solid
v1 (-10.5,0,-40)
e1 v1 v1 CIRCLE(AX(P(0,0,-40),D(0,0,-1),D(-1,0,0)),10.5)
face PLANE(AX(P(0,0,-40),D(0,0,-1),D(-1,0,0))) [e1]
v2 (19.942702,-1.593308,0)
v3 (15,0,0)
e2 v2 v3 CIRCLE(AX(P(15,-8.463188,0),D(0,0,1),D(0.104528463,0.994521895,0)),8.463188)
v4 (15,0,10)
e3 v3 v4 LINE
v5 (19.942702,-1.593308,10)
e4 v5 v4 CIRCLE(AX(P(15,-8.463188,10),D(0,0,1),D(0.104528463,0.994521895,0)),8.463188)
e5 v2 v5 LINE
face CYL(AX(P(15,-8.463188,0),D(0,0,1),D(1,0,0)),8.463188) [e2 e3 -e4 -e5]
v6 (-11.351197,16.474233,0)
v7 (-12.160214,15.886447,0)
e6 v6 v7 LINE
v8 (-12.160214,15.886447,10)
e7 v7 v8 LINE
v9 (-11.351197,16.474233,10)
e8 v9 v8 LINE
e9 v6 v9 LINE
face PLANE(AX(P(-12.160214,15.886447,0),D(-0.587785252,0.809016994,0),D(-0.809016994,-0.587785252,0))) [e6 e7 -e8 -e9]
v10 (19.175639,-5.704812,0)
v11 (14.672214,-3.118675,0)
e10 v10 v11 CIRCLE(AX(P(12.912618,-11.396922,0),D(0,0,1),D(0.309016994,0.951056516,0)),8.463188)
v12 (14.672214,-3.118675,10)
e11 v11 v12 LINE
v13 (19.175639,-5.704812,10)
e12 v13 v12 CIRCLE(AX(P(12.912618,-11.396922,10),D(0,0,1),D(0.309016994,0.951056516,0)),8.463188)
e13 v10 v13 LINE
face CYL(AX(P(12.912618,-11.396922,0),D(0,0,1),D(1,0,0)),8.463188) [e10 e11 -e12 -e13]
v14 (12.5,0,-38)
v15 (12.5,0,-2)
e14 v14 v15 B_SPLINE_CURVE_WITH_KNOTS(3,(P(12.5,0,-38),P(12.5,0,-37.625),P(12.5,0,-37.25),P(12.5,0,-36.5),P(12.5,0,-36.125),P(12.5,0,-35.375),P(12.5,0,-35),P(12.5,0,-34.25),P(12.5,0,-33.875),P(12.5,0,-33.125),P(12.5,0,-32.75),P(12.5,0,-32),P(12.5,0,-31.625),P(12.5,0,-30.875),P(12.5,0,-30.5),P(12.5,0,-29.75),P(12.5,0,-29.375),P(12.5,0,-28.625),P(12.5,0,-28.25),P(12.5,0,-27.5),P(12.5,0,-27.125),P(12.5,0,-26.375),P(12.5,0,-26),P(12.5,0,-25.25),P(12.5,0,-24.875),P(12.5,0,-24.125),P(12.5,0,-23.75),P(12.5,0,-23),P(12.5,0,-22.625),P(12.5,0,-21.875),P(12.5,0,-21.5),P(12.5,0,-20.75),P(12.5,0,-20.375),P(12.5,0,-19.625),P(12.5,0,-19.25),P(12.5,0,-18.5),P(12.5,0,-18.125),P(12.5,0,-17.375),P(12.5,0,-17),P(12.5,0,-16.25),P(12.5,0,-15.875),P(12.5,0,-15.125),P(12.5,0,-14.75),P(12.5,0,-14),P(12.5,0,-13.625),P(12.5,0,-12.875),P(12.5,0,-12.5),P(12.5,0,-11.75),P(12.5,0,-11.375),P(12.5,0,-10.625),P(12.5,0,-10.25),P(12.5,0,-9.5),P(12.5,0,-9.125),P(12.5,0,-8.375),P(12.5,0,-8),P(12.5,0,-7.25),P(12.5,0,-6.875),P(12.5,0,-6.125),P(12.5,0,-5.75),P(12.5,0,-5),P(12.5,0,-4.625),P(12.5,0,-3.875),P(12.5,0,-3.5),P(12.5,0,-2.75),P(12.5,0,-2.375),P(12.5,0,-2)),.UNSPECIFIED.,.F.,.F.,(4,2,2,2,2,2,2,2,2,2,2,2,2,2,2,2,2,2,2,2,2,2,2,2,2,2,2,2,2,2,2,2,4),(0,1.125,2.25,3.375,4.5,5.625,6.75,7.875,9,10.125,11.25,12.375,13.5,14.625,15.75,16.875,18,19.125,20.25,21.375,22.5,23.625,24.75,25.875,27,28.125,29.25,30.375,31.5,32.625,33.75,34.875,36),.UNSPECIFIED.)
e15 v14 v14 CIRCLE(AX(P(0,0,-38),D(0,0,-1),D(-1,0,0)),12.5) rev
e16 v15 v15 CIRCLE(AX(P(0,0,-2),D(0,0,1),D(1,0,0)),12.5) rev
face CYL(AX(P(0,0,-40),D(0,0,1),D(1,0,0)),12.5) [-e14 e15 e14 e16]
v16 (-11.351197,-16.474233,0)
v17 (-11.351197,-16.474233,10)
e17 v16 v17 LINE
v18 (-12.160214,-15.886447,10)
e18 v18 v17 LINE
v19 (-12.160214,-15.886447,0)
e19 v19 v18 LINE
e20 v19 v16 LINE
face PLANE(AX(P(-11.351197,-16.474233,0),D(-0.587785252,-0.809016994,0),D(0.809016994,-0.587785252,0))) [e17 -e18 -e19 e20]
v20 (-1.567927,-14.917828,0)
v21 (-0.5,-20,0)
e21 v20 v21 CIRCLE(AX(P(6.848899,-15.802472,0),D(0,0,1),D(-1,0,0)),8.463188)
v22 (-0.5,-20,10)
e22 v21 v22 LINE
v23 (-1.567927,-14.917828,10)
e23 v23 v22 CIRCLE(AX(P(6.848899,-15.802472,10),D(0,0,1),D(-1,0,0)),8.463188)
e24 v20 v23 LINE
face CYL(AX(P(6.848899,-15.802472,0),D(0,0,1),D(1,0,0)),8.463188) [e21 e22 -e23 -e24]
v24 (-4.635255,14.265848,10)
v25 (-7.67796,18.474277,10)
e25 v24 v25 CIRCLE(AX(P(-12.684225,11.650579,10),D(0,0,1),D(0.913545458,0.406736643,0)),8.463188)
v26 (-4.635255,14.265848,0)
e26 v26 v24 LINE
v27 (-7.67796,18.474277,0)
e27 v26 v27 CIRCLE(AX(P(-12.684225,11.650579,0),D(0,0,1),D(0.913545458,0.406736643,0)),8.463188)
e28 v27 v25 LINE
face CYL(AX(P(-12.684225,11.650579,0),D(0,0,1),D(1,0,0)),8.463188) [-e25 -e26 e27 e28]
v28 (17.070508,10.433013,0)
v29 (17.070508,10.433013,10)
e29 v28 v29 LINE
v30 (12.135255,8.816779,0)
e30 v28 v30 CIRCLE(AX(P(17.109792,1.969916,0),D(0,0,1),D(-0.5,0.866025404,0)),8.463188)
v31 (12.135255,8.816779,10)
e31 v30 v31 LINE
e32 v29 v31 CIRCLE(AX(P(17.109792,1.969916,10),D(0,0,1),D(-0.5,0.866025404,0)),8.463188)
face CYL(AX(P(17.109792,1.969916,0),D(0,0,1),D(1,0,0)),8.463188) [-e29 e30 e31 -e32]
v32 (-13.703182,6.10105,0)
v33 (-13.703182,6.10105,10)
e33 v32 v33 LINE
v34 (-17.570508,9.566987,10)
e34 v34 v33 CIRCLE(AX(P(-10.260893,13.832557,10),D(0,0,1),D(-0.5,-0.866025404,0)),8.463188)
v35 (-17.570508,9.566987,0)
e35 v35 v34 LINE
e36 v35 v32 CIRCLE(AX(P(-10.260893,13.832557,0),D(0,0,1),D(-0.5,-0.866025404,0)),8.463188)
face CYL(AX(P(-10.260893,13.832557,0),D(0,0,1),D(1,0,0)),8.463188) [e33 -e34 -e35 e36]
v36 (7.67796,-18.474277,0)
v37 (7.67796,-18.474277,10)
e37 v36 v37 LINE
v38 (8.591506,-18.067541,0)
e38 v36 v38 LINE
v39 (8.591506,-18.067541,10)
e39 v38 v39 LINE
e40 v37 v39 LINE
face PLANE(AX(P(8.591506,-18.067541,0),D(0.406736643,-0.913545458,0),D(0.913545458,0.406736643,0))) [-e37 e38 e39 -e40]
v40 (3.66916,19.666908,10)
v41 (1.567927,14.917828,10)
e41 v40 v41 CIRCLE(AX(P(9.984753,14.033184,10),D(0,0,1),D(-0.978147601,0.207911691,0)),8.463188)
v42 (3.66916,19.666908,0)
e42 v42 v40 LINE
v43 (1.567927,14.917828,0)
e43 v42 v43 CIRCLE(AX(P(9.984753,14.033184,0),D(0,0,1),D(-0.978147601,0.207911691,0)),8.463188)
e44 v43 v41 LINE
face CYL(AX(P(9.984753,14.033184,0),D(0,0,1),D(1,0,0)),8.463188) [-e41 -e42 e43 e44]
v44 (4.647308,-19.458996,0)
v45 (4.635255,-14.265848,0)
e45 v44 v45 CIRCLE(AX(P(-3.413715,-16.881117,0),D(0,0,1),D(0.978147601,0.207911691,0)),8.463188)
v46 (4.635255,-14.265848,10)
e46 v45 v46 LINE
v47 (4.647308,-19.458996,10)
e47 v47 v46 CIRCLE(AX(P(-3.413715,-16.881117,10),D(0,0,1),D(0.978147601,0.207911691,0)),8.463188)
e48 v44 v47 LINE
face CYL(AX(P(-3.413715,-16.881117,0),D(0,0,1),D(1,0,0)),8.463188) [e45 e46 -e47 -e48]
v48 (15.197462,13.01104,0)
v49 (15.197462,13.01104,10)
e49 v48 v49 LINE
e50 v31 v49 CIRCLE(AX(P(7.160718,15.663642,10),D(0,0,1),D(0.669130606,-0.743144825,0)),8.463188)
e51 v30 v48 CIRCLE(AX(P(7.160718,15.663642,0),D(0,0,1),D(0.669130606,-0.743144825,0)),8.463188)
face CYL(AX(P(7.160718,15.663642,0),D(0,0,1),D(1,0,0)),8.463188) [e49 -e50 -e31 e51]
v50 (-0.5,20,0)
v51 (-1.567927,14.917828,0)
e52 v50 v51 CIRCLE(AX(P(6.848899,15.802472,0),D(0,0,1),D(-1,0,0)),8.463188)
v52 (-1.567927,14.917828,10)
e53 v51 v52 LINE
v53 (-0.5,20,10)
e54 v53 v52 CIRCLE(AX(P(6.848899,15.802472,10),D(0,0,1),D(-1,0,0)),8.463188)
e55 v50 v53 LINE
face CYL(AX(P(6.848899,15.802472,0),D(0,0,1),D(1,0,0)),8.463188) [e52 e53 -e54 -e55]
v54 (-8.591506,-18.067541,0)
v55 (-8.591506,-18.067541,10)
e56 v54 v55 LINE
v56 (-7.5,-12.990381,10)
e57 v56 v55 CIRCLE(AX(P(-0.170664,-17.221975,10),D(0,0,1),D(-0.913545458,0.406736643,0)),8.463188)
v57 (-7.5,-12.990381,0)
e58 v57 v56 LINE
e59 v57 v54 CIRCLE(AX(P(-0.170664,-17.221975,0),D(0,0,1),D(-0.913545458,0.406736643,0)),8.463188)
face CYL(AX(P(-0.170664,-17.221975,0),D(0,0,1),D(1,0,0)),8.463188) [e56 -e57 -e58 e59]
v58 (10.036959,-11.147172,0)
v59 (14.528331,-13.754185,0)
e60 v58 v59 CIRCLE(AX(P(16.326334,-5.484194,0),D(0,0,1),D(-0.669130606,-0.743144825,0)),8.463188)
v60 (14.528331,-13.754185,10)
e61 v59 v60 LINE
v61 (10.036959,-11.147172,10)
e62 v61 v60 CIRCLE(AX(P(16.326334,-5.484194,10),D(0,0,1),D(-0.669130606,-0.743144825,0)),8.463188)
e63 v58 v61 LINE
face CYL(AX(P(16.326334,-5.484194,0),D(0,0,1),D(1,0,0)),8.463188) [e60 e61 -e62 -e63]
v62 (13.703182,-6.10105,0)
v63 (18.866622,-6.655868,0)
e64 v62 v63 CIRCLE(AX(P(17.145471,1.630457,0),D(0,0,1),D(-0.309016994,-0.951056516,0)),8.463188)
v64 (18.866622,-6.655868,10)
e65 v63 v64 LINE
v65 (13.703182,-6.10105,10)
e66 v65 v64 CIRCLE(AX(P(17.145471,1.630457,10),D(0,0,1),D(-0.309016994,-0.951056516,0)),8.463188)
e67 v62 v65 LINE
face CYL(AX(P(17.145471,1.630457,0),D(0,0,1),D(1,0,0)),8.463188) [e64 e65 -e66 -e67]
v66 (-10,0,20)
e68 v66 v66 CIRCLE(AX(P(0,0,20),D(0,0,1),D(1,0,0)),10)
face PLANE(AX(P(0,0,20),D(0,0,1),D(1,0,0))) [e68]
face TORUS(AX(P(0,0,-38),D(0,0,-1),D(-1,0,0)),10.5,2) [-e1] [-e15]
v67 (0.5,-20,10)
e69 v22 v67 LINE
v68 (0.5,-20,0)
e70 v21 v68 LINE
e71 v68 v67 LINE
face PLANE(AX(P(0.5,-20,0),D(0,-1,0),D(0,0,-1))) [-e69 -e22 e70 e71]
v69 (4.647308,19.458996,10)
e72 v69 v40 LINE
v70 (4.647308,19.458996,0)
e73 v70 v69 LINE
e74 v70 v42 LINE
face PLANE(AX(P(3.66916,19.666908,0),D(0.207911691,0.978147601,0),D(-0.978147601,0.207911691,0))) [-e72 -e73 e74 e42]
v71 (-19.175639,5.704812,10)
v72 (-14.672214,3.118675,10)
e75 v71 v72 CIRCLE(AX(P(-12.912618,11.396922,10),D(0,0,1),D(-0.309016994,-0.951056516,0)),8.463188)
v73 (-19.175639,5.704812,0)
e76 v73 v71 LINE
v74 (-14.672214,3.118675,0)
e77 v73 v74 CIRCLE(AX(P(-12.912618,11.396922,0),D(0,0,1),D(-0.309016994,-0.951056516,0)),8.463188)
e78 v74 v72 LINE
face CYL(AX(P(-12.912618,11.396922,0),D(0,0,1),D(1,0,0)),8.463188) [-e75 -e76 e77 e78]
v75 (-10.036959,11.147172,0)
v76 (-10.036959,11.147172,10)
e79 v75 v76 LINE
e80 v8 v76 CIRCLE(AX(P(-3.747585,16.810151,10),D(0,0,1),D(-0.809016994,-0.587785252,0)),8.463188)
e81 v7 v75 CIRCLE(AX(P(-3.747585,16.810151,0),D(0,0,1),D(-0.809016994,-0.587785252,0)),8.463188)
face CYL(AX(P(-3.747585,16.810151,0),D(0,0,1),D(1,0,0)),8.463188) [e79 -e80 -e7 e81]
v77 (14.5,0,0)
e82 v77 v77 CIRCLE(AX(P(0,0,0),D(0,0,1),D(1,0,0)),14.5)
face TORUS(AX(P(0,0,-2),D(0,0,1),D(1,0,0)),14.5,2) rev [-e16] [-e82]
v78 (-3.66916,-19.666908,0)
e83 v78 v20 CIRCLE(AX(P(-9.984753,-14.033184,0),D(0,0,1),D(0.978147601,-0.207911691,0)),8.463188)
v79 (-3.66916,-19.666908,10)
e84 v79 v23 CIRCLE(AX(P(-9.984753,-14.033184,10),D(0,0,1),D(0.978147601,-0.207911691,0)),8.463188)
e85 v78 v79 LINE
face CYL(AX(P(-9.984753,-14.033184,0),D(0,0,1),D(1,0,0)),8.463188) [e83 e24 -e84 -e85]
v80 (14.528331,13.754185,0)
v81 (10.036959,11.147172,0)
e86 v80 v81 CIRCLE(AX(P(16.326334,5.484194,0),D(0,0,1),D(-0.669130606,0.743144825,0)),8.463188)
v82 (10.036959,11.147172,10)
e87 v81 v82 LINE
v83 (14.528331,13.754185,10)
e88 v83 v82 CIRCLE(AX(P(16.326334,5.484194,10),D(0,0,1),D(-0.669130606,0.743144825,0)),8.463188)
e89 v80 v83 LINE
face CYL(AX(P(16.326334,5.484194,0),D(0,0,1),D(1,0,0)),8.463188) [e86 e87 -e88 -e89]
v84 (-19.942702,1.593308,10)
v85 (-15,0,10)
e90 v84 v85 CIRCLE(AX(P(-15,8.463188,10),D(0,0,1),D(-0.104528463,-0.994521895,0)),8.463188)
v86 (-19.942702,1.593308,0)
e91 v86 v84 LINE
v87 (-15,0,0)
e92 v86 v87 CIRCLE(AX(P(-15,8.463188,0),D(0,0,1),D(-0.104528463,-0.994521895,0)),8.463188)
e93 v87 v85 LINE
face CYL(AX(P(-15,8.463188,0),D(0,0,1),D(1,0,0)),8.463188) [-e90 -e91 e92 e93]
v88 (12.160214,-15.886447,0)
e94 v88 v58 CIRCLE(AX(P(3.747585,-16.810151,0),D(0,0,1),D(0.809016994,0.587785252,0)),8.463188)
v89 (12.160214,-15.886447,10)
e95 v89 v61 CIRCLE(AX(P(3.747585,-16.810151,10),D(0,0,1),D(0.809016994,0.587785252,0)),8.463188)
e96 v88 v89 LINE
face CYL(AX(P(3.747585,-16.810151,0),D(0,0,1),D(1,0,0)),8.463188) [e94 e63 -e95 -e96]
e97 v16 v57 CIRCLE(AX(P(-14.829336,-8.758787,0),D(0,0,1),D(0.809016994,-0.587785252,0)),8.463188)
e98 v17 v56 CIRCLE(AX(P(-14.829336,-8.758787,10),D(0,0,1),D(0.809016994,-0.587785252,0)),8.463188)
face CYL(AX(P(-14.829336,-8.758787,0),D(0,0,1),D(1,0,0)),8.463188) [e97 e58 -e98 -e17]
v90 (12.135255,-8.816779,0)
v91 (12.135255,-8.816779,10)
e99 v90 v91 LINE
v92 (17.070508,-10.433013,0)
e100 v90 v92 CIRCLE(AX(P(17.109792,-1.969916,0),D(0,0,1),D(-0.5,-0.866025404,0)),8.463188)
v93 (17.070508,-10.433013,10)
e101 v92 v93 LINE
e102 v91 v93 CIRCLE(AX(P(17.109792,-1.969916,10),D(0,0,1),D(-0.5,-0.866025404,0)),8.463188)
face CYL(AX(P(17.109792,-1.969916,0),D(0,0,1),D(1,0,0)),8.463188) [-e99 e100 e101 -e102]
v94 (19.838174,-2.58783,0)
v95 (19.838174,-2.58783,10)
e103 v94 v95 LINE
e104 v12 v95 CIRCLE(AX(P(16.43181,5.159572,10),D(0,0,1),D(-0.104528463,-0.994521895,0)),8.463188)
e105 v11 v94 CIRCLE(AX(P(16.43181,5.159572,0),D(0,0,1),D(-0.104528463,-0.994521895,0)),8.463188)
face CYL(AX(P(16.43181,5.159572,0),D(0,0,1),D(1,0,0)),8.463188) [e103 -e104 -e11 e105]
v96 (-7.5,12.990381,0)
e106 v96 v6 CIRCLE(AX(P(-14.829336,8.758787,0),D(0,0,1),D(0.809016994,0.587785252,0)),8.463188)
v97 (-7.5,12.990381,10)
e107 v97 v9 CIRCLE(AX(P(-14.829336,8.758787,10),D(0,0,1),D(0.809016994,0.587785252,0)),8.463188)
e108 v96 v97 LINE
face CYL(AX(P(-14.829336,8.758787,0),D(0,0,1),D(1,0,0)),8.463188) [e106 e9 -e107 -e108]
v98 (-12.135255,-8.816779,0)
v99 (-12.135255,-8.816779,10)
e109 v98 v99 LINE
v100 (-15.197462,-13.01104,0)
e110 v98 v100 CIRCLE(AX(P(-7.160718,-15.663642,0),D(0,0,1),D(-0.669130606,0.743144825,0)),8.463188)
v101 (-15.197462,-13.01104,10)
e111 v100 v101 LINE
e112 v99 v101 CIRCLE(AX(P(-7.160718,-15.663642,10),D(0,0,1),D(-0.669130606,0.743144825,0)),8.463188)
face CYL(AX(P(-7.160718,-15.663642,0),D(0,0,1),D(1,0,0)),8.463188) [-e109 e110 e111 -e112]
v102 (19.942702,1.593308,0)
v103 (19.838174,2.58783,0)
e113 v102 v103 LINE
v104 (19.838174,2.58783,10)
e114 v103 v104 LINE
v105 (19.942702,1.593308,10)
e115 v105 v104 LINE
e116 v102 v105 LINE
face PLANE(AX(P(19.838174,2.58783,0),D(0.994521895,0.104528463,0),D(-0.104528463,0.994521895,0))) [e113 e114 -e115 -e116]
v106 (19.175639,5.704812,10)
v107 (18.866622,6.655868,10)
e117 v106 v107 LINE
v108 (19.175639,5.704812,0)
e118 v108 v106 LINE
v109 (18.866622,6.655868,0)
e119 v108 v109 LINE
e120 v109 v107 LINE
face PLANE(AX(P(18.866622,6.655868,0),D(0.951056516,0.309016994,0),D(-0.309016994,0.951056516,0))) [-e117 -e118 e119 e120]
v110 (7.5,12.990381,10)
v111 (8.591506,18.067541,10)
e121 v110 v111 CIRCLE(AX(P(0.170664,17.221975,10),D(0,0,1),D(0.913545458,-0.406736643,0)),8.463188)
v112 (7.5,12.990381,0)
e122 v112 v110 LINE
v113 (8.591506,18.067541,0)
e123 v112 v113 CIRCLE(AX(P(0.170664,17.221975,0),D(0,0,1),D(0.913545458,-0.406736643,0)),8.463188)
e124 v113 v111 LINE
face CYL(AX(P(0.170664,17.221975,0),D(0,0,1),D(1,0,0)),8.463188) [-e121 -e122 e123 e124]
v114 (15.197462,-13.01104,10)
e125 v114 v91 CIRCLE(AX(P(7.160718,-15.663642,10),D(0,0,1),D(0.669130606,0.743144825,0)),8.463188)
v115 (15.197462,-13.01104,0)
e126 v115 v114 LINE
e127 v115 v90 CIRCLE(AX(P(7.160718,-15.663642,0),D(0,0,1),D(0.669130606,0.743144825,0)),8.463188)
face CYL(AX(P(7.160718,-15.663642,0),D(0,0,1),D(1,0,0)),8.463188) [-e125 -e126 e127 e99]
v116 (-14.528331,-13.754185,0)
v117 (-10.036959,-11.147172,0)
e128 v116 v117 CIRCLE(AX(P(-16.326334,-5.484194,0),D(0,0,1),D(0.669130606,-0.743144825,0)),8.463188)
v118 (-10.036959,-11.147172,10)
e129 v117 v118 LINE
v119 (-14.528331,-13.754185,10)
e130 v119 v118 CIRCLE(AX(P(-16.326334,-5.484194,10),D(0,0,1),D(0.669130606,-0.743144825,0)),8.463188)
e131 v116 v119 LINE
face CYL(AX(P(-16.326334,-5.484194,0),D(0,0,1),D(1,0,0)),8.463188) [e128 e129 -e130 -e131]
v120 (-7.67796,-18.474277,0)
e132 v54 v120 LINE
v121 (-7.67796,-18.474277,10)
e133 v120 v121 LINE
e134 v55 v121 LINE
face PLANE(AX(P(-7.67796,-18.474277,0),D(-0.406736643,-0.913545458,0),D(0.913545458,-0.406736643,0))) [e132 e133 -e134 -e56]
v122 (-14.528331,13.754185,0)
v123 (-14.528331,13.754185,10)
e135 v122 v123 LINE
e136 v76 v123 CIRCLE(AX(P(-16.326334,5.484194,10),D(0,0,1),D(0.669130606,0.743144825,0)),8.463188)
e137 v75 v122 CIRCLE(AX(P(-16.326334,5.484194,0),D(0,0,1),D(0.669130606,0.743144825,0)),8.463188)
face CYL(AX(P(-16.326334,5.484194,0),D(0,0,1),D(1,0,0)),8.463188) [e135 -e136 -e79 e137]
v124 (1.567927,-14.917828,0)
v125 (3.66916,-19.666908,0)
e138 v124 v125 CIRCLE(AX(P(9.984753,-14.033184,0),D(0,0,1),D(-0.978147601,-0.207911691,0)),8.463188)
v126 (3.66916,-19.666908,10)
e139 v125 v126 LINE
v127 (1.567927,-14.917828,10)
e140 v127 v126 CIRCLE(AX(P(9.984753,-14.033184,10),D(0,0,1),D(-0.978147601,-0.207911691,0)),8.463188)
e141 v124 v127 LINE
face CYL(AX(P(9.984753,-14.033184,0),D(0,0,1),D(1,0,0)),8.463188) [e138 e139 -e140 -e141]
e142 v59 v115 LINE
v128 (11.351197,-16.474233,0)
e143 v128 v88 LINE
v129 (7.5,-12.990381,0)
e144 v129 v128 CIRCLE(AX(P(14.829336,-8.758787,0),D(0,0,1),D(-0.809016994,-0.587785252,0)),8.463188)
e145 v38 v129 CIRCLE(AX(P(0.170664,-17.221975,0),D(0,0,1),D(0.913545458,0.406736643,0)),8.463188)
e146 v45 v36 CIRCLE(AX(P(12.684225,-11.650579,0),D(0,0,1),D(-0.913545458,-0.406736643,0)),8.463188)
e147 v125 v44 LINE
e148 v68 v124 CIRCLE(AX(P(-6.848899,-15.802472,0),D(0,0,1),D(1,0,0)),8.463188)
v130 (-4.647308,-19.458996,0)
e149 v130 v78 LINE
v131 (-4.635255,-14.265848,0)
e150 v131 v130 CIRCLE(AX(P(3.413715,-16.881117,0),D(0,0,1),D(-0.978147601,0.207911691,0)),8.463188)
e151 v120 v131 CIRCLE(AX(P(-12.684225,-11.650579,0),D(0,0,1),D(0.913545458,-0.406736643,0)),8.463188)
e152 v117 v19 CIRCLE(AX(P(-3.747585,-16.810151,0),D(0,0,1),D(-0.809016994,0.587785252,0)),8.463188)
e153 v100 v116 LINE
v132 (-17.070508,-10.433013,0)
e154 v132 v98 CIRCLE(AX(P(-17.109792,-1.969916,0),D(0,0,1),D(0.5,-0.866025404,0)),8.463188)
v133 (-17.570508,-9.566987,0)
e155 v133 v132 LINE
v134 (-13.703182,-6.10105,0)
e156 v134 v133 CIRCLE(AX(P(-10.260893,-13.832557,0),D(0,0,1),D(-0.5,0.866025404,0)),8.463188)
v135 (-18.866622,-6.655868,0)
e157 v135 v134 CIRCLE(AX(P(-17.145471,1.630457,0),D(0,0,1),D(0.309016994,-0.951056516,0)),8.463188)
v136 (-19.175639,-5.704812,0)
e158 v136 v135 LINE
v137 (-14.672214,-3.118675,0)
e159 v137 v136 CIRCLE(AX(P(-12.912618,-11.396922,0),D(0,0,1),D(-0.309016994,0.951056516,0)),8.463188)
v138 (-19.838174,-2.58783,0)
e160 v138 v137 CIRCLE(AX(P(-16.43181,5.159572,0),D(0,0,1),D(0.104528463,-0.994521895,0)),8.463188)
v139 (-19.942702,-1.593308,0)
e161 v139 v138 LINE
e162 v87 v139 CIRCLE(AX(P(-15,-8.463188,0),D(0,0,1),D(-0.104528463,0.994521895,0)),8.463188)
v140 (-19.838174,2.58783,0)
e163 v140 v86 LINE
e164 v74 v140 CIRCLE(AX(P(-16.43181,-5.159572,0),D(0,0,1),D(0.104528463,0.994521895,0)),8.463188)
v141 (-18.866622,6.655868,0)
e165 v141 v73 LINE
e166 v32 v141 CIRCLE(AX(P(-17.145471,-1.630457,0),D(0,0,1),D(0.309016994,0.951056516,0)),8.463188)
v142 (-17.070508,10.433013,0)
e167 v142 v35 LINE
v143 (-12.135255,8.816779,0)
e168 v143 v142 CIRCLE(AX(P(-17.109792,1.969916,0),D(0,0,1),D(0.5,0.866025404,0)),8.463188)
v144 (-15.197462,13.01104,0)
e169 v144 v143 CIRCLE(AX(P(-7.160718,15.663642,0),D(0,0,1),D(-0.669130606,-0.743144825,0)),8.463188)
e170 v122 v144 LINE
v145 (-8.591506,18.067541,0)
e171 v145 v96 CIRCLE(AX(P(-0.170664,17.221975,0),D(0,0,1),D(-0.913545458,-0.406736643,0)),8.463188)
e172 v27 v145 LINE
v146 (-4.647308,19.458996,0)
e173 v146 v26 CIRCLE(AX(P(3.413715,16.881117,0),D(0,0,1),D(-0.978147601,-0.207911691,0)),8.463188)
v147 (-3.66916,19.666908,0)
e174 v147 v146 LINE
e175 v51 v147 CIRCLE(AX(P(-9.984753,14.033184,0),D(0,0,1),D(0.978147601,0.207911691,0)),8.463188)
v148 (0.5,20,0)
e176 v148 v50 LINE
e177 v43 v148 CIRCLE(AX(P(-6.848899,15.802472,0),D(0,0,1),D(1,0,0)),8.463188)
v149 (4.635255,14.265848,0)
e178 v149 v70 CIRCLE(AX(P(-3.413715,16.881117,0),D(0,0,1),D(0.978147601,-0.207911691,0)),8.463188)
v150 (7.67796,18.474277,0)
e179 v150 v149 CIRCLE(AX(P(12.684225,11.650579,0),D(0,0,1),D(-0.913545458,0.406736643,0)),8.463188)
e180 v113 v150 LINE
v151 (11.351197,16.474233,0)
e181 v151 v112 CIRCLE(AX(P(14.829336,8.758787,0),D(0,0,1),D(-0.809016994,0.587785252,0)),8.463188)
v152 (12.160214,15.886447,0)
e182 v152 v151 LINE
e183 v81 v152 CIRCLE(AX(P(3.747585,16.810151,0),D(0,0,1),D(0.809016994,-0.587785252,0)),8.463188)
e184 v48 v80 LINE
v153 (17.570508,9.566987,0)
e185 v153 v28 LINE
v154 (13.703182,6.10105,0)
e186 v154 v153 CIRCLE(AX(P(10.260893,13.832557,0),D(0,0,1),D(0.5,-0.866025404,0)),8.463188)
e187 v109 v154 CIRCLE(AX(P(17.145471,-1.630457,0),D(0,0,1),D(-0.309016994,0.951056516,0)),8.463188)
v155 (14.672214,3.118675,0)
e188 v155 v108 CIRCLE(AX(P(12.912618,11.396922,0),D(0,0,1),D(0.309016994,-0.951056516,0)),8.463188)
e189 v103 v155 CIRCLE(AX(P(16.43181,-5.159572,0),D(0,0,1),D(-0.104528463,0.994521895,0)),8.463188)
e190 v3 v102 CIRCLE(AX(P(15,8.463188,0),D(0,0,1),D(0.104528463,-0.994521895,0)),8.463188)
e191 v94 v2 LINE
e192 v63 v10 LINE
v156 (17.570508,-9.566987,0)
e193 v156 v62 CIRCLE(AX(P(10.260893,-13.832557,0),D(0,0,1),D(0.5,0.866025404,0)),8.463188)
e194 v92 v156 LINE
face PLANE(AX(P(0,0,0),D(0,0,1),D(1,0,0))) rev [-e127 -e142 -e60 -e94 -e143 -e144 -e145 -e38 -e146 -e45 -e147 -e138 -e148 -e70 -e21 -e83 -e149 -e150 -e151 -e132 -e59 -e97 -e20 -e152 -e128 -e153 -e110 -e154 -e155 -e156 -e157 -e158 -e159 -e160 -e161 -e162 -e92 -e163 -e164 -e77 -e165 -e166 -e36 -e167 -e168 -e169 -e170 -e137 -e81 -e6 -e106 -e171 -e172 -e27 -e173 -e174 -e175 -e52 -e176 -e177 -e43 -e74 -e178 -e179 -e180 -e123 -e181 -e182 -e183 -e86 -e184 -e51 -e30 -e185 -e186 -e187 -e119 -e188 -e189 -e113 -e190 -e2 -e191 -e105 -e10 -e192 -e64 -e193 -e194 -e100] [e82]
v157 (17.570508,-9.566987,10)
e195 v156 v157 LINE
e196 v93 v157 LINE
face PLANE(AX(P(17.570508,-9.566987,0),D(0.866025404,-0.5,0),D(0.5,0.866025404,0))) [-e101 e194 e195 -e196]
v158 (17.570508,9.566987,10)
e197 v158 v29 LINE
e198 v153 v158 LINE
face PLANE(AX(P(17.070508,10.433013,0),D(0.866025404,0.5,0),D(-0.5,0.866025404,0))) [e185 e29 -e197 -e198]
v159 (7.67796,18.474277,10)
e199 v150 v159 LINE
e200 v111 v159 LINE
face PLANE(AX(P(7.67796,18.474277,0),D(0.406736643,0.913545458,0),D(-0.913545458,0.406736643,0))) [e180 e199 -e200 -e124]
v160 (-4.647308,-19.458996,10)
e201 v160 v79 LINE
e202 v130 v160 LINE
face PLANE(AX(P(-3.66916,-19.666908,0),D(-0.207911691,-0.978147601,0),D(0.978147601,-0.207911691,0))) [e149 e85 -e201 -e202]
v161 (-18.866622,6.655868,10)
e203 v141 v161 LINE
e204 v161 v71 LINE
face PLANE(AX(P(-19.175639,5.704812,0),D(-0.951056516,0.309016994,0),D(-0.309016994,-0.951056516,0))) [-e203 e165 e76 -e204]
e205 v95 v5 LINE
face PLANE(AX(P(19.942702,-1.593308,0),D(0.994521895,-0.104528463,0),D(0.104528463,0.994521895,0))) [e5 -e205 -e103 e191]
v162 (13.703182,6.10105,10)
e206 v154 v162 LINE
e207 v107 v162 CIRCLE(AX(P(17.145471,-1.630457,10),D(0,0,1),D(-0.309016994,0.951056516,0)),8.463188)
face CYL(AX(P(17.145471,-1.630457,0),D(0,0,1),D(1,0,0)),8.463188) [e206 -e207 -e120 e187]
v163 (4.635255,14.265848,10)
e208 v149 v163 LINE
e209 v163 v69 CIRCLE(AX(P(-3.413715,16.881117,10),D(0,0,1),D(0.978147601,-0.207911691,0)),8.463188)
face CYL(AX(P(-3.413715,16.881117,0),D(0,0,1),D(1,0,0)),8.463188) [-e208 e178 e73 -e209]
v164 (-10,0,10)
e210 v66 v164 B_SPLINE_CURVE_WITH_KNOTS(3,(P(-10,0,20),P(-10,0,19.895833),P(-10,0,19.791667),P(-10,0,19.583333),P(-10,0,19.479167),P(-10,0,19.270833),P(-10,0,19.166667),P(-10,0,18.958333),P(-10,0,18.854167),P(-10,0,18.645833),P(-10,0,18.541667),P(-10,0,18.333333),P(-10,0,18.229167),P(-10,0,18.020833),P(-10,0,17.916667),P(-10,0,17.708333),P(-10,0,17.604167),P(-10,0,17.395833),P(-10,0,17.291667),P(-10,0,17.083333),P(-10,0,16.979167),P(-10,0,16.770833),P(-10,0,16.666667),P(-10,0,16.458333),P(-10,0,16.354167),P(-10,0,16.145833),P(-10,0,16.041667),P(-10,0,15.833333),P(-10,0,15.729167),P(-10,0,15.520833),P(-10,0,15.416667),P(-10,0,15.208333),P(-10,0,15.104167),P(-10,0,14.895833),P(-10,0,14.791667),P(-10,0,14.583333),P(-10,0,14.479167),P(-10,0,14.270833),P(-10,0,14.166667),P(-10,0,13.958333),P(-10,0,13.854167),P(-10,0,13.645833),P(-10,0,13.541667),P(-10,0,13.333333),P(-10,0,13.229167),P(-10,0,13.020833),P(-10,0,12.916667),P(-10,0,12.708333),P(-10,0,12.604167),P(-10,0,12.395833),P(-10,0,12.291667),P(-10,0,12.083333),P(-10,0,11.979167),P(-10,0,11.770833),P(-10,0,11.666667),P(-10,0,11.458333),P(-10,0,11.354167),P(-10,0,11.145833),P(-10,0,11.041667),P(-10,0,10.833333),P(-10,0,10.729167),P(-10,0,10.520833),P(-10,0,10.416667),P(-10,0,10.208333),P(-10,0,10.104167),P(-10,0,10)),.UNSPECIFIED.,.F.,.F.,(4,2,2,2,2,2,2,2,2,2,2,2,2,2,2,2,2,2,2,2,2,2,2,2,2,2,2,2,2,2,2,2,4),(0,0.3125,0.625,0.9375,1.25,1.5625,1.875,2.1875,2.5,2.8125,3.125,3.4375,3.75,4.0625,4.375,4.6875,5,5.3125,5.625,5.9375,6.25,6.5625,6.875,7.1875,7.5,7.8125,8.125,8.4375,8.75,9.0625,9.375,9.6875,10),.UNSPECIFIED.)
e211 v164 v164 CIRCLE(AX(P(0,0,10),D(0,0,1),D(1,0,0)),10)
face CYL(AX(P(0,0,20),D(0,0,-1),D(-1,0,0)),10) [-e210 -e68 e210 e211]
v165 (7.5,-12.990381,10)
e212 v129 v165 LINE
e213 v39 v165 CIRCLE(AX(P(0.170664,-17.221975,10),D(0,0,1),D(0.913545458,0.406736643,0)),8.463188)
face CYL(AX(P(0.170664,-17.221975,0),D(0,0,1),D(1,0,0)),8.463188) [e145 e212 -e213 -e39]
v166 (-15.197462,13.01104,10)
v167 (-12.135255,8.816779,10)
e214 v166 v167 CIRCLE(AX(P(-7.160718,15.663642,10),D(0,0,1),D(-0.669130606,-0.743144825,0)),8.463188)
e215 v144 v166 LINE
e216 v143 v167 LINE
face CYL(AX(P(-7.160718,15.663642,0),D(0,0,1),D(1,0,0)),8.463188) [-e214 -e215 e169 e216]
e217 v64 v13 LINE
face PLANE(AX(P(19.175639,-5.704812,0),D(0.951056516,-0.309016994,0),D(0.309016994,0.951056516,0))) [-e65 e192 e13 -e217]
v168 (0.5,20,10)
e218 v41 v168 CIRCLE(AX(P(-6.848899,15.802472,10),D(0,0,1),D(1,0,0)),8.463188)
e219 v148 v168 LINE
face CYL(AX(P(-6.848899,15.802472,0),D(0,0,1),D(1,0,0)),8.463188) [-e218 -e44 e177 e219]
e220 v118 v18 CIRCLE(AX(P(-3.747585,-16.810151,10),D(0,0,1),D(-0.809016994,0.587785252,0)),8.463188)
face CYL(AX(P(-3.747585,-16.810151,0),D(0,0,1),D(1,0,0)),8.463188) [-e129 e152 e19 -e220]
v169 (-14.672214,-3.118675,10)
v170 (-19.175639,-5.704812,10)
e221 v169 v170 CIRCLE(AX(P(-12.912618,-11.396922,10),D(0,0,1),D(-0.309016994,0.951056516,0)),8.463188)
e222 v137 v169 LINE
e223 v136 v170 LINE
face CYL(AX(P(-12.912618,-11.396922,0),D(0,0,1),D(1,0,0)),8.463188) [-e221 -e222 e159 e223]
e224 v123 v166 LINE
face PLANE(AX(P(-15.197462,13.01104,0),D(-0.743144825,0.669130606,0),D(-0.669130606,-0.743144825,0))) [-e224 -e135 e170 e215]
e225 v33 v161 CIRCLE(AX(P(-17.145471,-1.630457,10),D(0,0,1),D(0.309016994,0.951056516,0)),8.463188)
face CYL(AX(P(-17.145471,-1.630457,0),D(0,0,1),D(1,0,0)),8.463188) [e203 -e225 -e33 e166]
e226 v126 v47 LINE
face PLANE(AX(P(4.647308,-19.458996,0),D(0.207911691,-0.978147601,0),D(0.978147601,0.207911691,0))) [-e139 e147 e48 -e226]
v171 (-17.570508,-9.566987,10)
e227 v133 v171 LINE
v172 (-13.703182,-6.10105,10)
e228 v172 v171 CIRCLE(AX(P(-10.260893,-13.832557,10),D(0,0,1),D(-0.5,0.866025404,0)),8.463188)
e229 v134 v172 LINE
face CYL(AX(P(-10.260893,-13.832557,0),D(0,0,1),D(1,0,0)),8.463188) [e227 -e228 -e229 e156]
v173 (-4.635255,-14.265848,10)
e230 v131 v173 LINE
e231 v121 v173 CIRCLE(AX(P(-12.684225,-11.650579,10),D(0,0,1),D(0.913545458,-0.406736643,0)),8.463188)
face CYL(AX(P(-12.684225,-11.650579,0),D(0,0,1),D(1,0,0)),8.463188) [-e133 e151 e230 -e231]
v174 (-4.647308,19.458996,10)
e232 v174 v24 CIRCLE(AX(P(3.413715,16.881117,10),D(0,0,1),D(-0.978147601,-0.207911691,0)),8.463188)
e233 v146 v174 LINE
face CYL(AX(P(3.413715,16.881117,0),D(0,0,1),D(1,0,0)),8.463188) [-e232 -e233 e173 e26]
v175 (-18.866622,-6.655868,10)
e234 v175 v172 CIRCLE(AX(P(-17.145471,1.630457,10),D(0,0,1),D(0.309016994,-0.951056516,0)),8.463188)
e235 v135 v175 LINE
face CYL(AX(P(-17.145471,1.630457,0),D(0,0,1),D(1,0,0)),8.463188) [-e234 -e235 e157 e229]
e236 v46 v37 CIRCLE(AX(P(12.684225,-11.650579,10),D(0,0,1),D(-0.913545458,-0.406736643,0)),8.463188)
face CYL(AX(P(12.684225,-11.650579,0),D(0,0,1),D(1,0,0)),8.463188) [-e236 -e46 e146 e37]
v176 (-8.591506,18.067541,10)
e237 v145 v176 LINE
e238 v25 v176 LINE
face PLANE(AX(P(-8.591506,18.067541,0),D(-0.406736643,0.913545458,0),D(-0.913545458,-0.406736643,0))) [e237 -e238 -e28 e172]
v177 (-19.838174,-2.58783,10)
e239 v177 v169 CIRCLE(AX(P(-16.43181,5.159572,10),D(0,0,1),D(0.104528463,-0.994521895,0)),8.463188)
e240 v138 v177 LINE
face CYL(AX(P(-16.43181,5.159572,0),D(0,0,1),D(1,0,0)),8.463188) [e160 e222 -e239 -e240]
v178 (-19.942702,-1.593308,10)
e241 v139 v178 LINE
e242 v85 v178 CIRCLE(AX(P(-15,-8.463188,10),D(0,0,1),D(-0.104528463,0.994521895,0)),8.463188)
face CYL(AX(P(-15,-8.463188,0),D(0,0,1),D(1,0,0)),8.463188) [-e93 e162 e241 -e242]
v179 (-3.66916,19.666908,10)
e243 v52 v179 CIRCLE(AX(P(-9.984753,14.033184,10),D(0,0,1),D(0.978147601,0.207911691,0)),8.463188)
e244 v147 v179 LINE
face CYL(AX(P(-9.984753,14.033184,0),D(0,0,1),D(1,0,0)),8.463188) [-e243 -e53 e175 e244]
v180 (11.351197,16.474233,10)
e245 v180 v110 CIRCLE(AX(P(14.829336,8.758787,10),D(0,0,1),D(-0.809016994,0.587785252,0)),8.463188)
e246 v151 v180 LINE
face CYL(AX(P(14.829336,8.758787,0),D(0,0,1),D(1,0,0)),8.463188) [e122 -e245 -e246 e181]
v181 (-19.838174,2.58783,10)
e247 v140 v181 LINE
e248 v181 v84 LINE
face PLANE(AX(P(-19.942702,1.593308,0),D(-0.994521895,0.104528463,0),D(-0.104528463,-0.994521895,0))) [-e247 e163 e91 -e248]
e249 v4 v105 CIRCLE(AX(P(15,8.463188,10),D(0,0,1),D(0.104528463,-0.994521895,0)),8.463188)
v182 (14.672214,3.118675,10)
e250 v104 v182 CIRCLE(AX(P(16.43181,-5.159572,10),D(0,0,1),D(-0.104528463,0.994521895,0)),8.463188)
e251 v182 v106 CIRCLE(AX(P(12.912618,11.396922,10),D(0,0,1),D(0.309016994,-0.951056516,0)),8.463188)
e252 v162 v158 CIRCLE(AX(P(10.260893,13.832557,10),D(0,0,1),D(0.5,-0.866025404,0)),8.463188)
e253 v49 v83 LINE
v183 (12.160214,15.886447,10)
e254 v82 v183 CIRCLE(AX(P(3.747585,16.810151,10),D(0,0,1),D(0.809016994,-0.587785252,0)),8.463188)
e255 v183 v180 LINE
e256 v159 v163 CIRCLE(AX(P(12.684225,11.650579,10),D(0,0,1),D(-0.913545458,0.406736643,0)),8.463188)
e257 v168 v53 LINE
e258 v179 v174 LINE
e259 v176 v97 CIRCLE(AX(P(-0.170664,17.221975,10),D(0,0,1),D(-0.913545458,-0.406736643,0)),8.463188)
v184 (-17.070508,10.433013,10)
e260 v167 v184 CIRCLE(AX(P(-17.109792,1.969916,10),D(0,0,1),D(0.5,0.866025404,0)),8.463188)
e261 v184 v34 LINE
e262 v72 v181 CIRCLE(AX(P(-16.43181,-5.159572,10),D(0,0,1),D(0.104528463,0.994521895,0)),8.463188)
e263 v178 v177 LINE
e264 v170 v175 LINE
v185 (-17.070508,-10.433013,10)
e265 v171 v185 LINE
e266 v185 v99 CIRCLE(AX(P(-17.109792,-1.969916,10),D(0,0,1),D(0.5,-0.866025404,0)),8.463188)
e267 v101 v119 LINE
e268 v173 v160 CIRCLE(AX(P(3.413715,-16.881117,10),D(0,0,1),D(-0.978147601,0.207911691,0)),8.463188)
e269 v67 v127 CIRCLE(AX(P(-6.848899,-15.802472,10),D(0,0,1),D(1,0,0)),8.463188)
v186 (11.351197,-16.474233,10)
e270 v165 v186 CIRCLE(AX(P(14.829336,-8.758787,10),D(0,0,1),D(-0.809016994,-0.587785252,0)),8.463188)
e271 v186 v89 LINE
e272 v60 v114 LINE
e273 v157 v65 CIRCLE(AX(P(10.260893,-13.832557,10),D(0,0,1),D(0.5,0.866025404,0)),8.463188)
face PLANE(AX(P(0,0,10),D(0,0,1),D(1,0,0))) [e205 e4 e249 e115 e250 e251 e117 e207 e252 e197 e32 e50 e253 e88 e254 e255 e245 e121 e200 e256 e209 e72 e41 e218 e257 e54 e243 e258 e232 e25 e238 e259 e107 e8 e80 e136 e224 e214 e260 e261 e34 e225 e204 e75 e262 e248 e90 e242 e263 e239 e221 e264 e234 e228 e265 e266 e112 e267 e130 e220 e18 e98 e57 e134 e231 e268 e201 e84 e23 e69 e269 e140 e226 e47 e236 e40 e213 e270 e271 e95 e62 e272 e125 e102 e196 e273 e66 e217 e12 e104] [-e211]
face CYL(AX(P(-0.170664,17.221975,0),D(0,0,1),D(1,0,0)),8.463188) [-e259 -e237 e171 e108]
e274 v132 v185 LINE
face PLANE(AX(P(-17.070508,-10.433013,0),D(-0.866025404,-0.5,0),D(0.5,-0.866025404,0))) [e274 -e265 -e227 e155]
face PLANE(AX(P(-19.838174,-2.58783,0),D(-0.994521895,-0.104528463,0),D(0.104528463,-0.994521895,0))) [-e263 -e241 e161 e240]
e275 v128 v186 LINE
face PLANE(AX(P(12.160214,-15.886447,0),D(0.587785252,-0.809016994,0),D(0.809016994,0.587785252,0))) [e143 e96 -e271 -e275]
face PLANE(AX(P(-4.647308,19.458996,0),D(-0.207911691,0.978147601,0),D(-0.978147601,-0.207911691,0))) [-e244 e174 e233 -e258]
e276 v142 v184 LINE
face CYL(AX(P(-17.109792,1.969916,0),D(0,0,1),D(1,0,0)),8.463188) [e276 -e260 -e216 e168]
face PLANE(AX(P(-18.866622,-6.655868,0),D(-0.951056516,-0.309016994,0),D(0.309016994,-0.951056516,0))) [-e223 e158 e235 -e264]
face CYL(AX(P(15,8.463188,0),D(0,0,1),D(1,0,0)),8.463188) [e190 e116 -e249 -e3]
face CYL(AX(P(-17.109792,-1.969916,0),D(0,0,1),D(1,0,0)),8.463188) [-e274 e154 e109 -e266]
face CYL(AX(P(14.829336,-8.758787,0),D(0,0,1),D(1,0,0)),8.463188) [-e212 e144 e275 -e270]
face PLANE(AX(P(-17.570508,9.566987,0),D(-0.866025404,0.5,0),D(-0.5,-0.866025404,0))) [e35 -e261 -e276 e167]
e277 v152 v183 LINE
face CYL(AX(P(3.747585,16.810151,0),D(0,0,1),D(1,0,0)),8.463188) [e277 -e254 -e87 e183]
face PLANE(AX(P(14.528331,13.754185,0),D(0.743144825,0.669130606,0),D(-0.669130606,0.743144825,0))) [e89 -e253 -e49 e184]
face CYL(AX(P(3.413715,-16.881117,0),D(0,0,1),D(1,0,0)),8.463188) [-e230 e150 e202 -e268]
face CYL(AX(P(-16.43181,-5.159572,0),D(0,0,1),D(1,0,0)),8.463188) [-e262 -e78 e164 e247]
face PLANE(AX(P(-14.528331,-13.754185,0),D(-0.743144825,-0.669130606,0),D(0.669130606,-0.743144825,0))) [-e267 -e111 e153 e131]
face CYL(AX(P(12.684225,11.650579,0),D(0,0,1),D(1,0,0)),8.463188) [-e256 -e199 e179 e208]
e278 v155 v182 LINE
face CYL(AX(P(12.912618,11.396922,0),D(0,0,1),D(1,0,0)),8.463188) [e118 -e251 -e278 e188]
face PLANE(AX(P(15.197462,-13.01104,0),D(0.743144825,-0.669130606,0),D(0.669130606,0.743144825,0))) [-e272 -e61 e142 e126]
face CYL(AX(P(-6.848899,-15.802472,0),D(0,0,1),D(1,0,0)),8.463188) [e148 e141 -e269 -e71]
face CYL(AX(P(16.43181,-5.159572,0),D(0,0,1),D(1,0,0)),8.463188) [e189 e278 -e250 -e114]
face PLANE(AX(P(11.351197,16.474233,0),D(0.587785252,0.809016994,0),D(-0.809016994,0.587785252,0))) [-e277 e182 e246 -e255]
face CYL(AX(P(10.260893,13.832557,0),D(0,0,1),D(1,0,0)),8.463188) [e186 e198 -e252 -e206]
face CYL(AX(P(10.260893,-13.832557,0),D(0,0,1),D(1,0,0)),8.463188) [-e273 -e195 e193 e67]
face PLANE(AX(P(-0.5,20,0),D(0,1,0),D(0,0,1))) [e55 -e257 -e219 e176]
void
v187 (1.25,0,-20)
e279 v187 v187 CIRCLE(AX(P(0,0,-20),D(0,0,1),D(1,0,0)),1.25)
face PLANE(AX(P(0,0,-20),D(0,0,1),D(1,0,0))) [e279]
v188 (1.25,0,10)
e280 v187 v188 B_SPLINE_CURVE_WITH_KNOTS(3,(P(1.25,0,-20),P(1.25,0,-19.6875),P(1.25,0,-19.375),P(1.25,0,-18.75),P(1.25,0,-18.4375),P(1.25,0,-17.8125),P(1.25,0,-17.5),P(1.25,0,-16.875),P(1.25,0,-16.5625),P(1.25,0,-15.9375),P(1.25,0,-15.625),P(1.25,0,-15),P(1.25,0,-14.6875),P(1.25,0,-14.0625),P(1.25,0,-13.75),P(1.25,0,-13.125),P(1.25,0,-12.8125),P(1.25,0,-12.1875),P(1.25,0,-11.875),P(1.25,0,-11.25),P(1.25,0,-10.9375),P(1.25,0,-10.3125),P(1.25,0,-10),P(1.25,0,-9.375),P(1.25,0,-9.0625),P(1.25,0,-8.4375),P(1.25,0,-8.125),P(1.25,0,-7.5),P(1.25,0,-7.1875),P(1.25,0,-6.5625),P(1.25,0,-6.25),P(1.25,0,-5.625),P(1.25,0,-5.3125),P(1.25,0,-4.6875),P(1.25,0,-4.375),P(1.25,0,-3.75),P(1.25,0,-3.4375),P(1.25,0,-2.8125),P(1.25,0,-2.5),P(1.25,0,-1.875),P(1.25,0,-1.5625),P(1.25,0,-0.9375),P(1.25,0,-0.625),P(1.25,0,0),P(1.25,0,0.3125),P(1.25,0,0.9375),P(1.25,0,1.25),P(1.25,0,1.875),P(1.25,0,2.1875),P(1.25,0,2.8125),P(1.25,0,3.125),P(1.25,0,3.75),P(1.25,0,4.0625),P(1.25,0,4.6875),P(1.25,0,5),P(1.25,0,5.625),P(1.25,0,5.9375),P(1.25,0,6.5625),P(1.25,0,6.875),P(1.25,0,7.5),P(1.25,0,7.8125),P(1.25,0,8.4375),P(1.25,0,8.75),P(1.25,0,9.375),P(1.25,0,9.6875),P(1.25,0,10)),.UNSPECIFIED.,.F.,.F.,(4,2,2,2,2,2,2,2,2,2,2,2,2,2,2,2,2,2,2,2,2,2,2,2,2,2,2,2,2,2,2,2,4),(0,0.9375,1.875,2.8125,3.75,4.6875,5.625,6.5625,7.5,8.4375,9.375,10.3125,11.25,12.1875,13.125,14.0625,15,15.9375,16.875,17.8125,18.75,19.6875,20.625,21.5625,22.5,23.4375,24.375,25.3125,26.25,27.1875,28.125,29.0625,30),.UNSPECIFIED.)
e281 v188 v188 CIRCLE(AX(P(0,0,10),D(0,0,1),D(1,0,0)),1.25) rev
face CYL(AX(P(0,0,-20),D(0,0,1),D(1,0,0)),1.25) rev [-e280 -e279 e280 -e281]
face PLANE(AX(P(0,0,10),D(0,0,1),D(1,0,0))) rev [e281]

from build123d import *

# Parameters (mm, degrees)
SKETCH_1_R               = 15
EXTRUDE_1_DEPTH          = 10
SKETCH_2_R               = 12.5
EXTRUDE_2_DEPTH          = 40
FILLET_2_R               = 2
FILLET_3_R               = 2
SKETCH_3_R               = 1.25
CUT_EXTRUDE_1_DEPTH      = 30
EXTRUDE_START            = -10
EXTRUDE_3_DEPTH          = 10
PATTERN_CIRCULAR_1_DEPTH = 10
SKETCH_5_R               = 10
EXTRUDE_4_DEPTH          = 10


# Read off the part's stored shape, not the designer's step: 阵列(圆周)1
with BuildPart() as part:
    # 草图1 → 凸台-拉伸1 (new body)
    with BuildSketch(Plane.XY):
        Circle(SKETCH_1_R)
    extrude(amount=EXTRUDE_1_DEPTH)

    # 草图2 → 凸台-拉伸2 (add)
    with BuildSketch(Plane(origin=(0, 0, 0), x_dir=(-1, 0, 0), z_dir=(0, 0, -1))):
        Circle(SKETCH_2_R)
    extrude(amount=EXTRUDE_2_DEPTH)

    # 圆角2
    fillet_2_edges = [part.edges().sort_by_distance(p)[0] for p in [
        (12.5, 0, 0),
    ]]
    fillet(fillet_2_edges, radius=FILLET_2_R)

    # 圆角3
    fillet_3_edges = [part.edges().sort_by_distance(p)[0] for p in [
        (12.5, 0, -40),
    ]]
    fillet(fillet_3_edges, radius=FILLET_3_R)

    # 草图3 → 切除-拉伸1 (cut)
    with BuildSketch(Plane.XY.offset(10)):
        Circle(SKETCH_3_R)
    extrude(amount=-CUT_EXTRUDE_1_DEPTH, mode=Mode.SUBTRACT)

    # 草图4 → 凸台-拉伸3 (add)
    with BuildSketch(Plane.XY.offset(10).offset(EXTRUDE_START)):
        with BuildLine():
            Line((-0.5, 20), (0.5, 20))
            ThreePointArc((0.5, 20), (1.433409728, 17.542850661), (1.567926949, 14.917828431))
            ThreePointArc((1.567926949, 14.917828431), (0, 15), (-1.567926949, 14.917828431))
            ThreePointArc((-1.567926949, 14.917828431), (-1.433409728, 17.542850661), (-0.5, 20))
        make_face()
    extrude(amount=EXTRUDE_3_DEPTH)

    # 阵列(圆周)1 outline → 阵列(圆周)1 (add)
    with BuildSketch(Plane.XY):
        with BuildLine():
            ThreePointArc((-4.635254916, 14.265847745), (-3.118675363, 14.672214011), (-1.567926949, 14.917828431))
            ThreePointArc((-1.567926949, 14.917828431), (-2.245277457, 17.457519924), (-3.669160016, 19.66690786))
            Line((-3.669160016, 19.66690786), (-4.647307617, 19.458996169))
            ThreePointArc((-4.647307617, 19.458996169), (-5.049450029, 16.861474644), (-4.635254916, 14.265847745))
        make_face()
        with BuildLine():
            ThreePointArc((1.567926949, 14.917828431), (3.118675363, 14.672214011), (4.635254916, 14.265847745))
            ThreePointArc((4.635254916, 14.265847745), (5.049450029, 16.861474644), (4.647307617, 19.458996169))
            Line((4.647307617, 19.458996169), (3.669160016, 19.66690786))
            ThreePointArc((3.669160016, 19.66690786), (2.245277457, 17.457519924), (1.567926949, 14.917828431))
        make_face()
        with BuildLine():
            ThreePointArc((4.635254916, 14.265847745), (6.101049646, 13.703181865), (7.5, 12.990381057))
            ThreePointArc((7.5, 12.990381057), (8.444805133, 15.443171275), (8.59150559, 18.067540831))
            Line((8.59150559, 18.067540831), (7.677960133, 18.474277474))
            ThreePointArc((7.677960133, 18.474277474), (5.825835242, 16.609211796), (4.635254916, 14.265847745))
        make_face()
        with BuildLine():
            ThreePointArc((7.5, 12.990381057), (8.816778785, 12.135254916), (10.036959096, 11.147172383))
            ThreePointArc((10.036959096, 11.147172383), (11.471081731, 13.349927216), (12.160213543, 15.886447261))
            Line((12.160213543, 15.886447261), (11.351196549, 16.474232514))
            ThreePointArc((11.351196549, 16.474232514), (9.151776072, 15.035001413), (7.5, 12.990381057))
        make_face()
        with BuildLine():
            ThreePointArc((10.036959096, 11.147172383), (11.147172383, 10.036959096), (12.135254916, 8.816778784))
            ThreePointArc((12.135254916, 8.816778784), (13.996017013, 10.673227278), (15.197461813, 13.011039714))
            Line((15.197461813, 13.011039714), (14.528331206, 13.75418454))
            ThreePointArc((14.528331206, 13.75418454), (12.077740372, 12.803689322), (10.036959096, 11.147172383))
        make_face()
        with BuildLine():
            ThreePointArc((12.135254916, 8.816778784), (12.990381057, 7.5), (13.703181865, 6.101049646))
            ThreePointArc((13.703181865, 6.101049646), (15.909259191, 7.530056092), (17.570508076, 9.566987298))
            Line((17.570508076, 9.566987298), (17.070508076, 10.433012702))
            ThreePointArc((17.070508076, 10.433012702), (14.475849464, 10.012794569), (12.135254916, 8.816778784))
        make_face()
        with BuildLine():
            ThreePointArc((13.703181865, 6.101049646), (14.265847745, 4.635254915), (14.672214011, 3.118675362))
            ThreePointArc((14.672214011, 3.118675362), (17.127190401, 4.057785322), (19.175638823, 5.704811629))
            Line((19.175638823, 5.704811629), (18.866621829, 6.655868146))
            ThreePointArc((18.866621829, 6.655868146), (16.24129447, 6.784292646), (13.703181865, 6.101049646))
        make_face()
        with BuildLine():
            ThreePointArc((14.672214011, 3.118675362), (14.917828431, 1.567926949), (15, 0))
            ThreePointArc((15, 0), (17.596581206, 0.408169862), (19.942702139, 1.593308318))
            Line((19.942702139, 1.593308318), (19.838173676, 2.587830213))
            ThreePointArc((19.838173676, 2.587830213), (17.296916974, 3.25928458), (14.672214011, 3.118675362))
        make_face()
        with BuildLine():
            ThreePointArc((15, 0), (14.917828431, -1.567926949), (14.672214011, -3.118675362))
            ThreePointArc((14.672214011, -3.118675362), (17.296916974, -3.25928458), (19.838173676, -2.587830213))
            Line((19.838173676, -2.587830213), (19.942702139, -1.593308318))
            ThreePointArc((19.942702139, -1.593308318), (17.596581206, -0.408169862), (15, 0))
        make_face()
        with BuildLine():
            ThreePointArc((14.672214011, -3.118675362), (14.265847745, -4.635254915), (13.703181865, -6.101049646))
            ThreePointArc((13.703181865, -6.101049646), (16.24129447, -6.784292646), (18.866621829, -6.655868146))
            Line((18.866621829, -6.655868146), (19.175638823, -5.704811629))
            ThreePointArc((19.175638823, -5.704811629), (17.127190401, -4.057785322), (14.672214011, -3.118675362))
        make_face()
        with BuildLine():
            ThreePointArc((13.703181865, -6.101049646), (12.990381057, -7.5), (12.135254916, -8.816778784))
            ThreePointArc((12.135254916, -8.816778784), (14.475849464, -10.012794569), (17.070508076, -10.433012702))
            Line((17.070508076, -10.433012702), (17.570508076, -9.566987298))
            ThreePointArc((17.570508076, -9.566987298), (15.909259191, -7.530056092), (13.703181865, -6.101049646))
        make_face()
        with BuildLine():
            ThreePointArc((12.135254916, -8.816778784), (11.147172382, -10.036959095), (10.036959095, -11.147172382))
            ThreePointArc((10.036959095, -11.147172382), (12.077740372, -12.803689322), (14.528331206, -13.75418454))
            Line((14.528331206, -13.75418454), (15.197461813, -13.011039714))
            ThreePointArc((15.197461813, -13.011039714), (13.996017013, -10.673227278), (12.135254916, -8.816778784))
        make_face()
        with BuildLine():
            ThreePointArc((10.036959095, -11.147172382), (8.816778784, -12.135254916), (7.5, -12.990381057))
            ThreePointArc((7.5, -12.990381057), (9.151776072, -15.035001413), (11.351196549, -16.474232514))
            Line((11.351196549, -16.474232514), (12.160213543, -15.886447261))
            ThreePointArc((12.160213543, -15.886447261), (11.471081731, -13.349927216), (10.036959095, -11.147172382))
        make_face()
        with BuildLine():
            ThreePointArc((7.5, -12.990381057), (6.101049646, -13.703181865), (4.635254916, -14.265847744))
            ThreePointArc((4.635254916, -14.265847744), (5.825835242, -16.609211796), (7.677960133, -18.474277474))
            Line((7.677960133, -18.474277474), (8.59150559, -18.067540831))
            ThreePointArc((8.59150559, -18.067540831), (8.444805133, -15.443171275), (7.5, -12.990381057))
        make_face()
        with BuildLine():
            ThreePointArc((4.635254916, -14.265847744), (3.118675362, -14.672214011), (1.567926949, -14.917828431))
            ThreePointArc((1.567926949, -14.917828431), (2.245277457, -17.457519924), (3.669160016, -19.66690786))
            Line((3.669160016, -19.66690786), (4.647307617, -19.458996169))
            ThreePointArc((4.647307617, -19.458996169), (5.049450029, -16.861474644), (4.635254916, -14.265847744))
        make_face()
        with BuildLine():
            ThreePointArc((1.567926949, -14.917828431), (0, -15), (-1.567926949, -14.917828431))
            ThreePointArc((-1.567926949, -14.917828431), (-1.433409728, -17.542850661), (-0.5, -20))
            Line((-0.5, -20), (0.5, -20))
            ThreePointArc((0.5, -20), (1.433409728, -17.542850661), (1.567926949, -14.917828431))
        make_face()
        with BuildLine():
            ThreePointArc((-1.567926949, -14.917828431), (-3.118675362, -14.672214011), (-4.635254916, -14.265847744))
            ThreePointArc((-4.635254916, -14.265847744), (-5.049450029, -16.861474644), (-4.647307617, -19.458996169))
            Line((-4.647307617, -19.458996169), (-3.669160016, -19.66690786))
            ThreePointArc((-3.669160016, -19.66690786), (-2.245277457, -17.457519924), (-1.567926949, -14.917828431))
        make_face()
        with BuildLine():
            ThreePointArc((-4.635254916, -14.265847744), (-6.101049646, -13.703181865), (-7.5, -12.990381057))
            ThreePointArc((-7.5, -12.990381057), (-8.444805133, -15.443171275), (-8.59150559, -18.067540831))
            Line((-8.59150559, -18.067540831), (-7.677960133, -18.474277474))
            ThreePointArc((-7.677960133, -18.474277474), (-5.825835242, -16.609211796), (-4.635254916, -14.265847744))
        make_face()
        with BuildLine():
            ThreePointArc((-7.5, -12.990381057), (-8.816778784, -12.135254916), (-10.036959095, -11.147172382))
            ThreePointArc((-10.036959095, -11.147172382), (-11.471081731, -13.349927216), (-12.160213543, -15.886447261))
            Line((-12.160213543, -15.886447261), (-11.351196549, -16.474232514))
            ThreePointArc((-11.351196549, -16.474232514), (-9.151776072, -15.035001413), (-7.5, -12.990381057))
        make_face()
        with BuildLine():
            ThreePointArc((-10.036959095, -11.147172382), (-11.147172382, -10.036959095), (-12.135254916, -8.816778784))
            ThreePointArc((-12.135254916, -8.816778784), (-13.996017013, -10.673227278), (-15.197461813, -13.011039714))
            Line((-15.197461813, -13.011039714), (-14.528331206, -13.75418454))
            ThreePointArc((-14.528331206, -13.75418454), (-12.077740372, -12.803689322), (-10.036959095, -11.147172382))
        make_face()
        with BuildLine():
            ThreePointArc((-12.135254916, -8.816778784), (-12.990381057, -7.5), (-13.703181865, -6.101049646))
            ThreePointArc((-13.703181865, -6.101049646), (-15.909259191, -7.530056092), (-17.570508076, -9.566987298))
            Line((-17.570508076, -9.566987298), (-17.070508076, -10.433012702))
            ThreePointArc((-17.070508076, -10.433012702), (-14.475849464, -10.012794569), (-12.135254916, -8.816778784))
        make_face()
        with BuildLine():
            ThreePointArc((-13.703181865, -6.101049646), (-14.265847745, -4.635254915), (-14.672214011, -3.118675362))
            ThreePointArc((-14.672214011, -3.118675362), (-17.127190401, -4.057785322), (-19.175638823, -5.704811629))
            Line((-19.175638823, -5.704811629), (-18.866621829, -6.655868146))
            ThreePointArc((-18.866621829, -6.655868146), (-16.24129447, -6.784292646), (-13.703181865, -6.101049646))
        make_face()
        with BuildLine():
            ThreePointArc((-14.672214011, -3.118675362), (-14.917828431, -1.567926949), (-15, 0))
            ThreePointArc((-15, 0), (-17.596581206, -0.408169862), (-19.942702139, -1.593308318))
            Line((-19.942702139, -1.593308318), (-19.838173676, -2.587830213))
            ThreePointArc((-19.838173676, -2.587830213), (-17.296916974, -3.25928458), (-14.672214011, -3.118675362))
        make_face()
        with BuildLine():
            ThreePointArc((-15, 0), (-14.917828431, 1.567926949), (-14.672214011, 3.118675362))
            ThreePointArc((-14.672214011, 3.118675362), (-17.296916974, 3.25928458), (-19.838173676, 2.587830213))
            Line((-19.838173676, 2.587830213), (-19.942702139, 1.593308318))
            ThreePointArc((-19.942702139, 1.593308318), (-17.596581206, 0.408169862), (-15, 0))
        make_face()
        with BuildLine():
            ThreePointArc((-14.672214011, 3.118675362), (-14.265847745, 4.635254915), (-13.703181865, 6.101049646))
            ThreePointArc((-13.703181865, 6.101049646), (-16.24129447, 6.784292646), (-18.866621829, 6.655868146))
            Line((-18.866621829, 6.655868146), (-19.175638823, 5.704811629))
            ThreePointArc((-19.175638823, 5.704811629), (-17.127190401, 4.057785322), (-14.672214011, 3.118675362))
        make_face()
        with BuildLine():
            ThreePointArc((-13.703181865, 6.101049646), (-12.990381057, 7.5), (-12.135254916, 8.816778784))
            ThreePointArc((-12.135254916, 8.816778784), (-14.475849464, 10.012794569), (-17.070508076, 10.433012702))
            Line((-17.070508076, 10.433012702), (-17.570508076, 9.566987298))
            ThreePointArc((-17.570508076, 9.566987298), (-15.909259191, 7.530056092), (-13.703181865, 6.101049646))
        make_face()
        with BuildLine():
            ThreePointArc((-12.135254916, 8.816778784), (-11.147172383, 10.036959096), (-10.036959096, 11.147172383))
            ThreePointArc((-10.036959096, 11.147172383), (-12.077740372, 12.803689322), (-14.528331206, 13.75418454))
            Line((-14.528331206, 13.75418454), (-15.197461813, 13.011039714))
            ThreePointArc((-15.197461813, 13.011039714), (-13.996017013, 10.673227278), (-12.135254916, 8.816778784))
        make_face()
        with BuildLine():
            ThreePointArc((-10.036959096, 11.147172383), (-8.816778785, 12.135254916), (-7.5, 12.990381057))
            ThreePointArc((-7.5, 12.990381057), (-9.151776072, 15.035001413), (-11.351196549, 16.474232514))
            Line((-11.351196549, 16.474232514), (-12.160213543, 15.886447261))
            ThreePointArc((-12.160213543, 15.886447261), (-11.471081731, 13.349927216), (-10.036959096, 11.147172383))
        make_face()
        with BuildLine():
            ThreePointArc((-7.5, 12.990381057), (-6.101049646, 13.703181865), (-4.635254916, 14.265847745))
            ThreePointArc((-4.635254916, 14.265847745), (-5.825835242, 16.609211796), (-7.677960133, 18.474277474))
            Line((-7.677960133, 18.474277474), (-8.59150559, 18.067540831))
            ThreePointArc((-8.59150559, 18.067540831), (-8.444805133, 15.443171275), (-7.5, 12.990381057))
        make_face()
    extrude(amount=PATTERN_CIRCULAR_1_DEPTH)

    # 草图5 → 凸台-拉伸4 (add)
    with BuildSketch(Plane.XY.offset(10)):
        with Locations(Location((0, 0, 0), (0, 0, 180))):
            Circle(SKETCH_5_R)
    extrude(amount=EXTRUDE_4_DEPTH)


solid = part.part
